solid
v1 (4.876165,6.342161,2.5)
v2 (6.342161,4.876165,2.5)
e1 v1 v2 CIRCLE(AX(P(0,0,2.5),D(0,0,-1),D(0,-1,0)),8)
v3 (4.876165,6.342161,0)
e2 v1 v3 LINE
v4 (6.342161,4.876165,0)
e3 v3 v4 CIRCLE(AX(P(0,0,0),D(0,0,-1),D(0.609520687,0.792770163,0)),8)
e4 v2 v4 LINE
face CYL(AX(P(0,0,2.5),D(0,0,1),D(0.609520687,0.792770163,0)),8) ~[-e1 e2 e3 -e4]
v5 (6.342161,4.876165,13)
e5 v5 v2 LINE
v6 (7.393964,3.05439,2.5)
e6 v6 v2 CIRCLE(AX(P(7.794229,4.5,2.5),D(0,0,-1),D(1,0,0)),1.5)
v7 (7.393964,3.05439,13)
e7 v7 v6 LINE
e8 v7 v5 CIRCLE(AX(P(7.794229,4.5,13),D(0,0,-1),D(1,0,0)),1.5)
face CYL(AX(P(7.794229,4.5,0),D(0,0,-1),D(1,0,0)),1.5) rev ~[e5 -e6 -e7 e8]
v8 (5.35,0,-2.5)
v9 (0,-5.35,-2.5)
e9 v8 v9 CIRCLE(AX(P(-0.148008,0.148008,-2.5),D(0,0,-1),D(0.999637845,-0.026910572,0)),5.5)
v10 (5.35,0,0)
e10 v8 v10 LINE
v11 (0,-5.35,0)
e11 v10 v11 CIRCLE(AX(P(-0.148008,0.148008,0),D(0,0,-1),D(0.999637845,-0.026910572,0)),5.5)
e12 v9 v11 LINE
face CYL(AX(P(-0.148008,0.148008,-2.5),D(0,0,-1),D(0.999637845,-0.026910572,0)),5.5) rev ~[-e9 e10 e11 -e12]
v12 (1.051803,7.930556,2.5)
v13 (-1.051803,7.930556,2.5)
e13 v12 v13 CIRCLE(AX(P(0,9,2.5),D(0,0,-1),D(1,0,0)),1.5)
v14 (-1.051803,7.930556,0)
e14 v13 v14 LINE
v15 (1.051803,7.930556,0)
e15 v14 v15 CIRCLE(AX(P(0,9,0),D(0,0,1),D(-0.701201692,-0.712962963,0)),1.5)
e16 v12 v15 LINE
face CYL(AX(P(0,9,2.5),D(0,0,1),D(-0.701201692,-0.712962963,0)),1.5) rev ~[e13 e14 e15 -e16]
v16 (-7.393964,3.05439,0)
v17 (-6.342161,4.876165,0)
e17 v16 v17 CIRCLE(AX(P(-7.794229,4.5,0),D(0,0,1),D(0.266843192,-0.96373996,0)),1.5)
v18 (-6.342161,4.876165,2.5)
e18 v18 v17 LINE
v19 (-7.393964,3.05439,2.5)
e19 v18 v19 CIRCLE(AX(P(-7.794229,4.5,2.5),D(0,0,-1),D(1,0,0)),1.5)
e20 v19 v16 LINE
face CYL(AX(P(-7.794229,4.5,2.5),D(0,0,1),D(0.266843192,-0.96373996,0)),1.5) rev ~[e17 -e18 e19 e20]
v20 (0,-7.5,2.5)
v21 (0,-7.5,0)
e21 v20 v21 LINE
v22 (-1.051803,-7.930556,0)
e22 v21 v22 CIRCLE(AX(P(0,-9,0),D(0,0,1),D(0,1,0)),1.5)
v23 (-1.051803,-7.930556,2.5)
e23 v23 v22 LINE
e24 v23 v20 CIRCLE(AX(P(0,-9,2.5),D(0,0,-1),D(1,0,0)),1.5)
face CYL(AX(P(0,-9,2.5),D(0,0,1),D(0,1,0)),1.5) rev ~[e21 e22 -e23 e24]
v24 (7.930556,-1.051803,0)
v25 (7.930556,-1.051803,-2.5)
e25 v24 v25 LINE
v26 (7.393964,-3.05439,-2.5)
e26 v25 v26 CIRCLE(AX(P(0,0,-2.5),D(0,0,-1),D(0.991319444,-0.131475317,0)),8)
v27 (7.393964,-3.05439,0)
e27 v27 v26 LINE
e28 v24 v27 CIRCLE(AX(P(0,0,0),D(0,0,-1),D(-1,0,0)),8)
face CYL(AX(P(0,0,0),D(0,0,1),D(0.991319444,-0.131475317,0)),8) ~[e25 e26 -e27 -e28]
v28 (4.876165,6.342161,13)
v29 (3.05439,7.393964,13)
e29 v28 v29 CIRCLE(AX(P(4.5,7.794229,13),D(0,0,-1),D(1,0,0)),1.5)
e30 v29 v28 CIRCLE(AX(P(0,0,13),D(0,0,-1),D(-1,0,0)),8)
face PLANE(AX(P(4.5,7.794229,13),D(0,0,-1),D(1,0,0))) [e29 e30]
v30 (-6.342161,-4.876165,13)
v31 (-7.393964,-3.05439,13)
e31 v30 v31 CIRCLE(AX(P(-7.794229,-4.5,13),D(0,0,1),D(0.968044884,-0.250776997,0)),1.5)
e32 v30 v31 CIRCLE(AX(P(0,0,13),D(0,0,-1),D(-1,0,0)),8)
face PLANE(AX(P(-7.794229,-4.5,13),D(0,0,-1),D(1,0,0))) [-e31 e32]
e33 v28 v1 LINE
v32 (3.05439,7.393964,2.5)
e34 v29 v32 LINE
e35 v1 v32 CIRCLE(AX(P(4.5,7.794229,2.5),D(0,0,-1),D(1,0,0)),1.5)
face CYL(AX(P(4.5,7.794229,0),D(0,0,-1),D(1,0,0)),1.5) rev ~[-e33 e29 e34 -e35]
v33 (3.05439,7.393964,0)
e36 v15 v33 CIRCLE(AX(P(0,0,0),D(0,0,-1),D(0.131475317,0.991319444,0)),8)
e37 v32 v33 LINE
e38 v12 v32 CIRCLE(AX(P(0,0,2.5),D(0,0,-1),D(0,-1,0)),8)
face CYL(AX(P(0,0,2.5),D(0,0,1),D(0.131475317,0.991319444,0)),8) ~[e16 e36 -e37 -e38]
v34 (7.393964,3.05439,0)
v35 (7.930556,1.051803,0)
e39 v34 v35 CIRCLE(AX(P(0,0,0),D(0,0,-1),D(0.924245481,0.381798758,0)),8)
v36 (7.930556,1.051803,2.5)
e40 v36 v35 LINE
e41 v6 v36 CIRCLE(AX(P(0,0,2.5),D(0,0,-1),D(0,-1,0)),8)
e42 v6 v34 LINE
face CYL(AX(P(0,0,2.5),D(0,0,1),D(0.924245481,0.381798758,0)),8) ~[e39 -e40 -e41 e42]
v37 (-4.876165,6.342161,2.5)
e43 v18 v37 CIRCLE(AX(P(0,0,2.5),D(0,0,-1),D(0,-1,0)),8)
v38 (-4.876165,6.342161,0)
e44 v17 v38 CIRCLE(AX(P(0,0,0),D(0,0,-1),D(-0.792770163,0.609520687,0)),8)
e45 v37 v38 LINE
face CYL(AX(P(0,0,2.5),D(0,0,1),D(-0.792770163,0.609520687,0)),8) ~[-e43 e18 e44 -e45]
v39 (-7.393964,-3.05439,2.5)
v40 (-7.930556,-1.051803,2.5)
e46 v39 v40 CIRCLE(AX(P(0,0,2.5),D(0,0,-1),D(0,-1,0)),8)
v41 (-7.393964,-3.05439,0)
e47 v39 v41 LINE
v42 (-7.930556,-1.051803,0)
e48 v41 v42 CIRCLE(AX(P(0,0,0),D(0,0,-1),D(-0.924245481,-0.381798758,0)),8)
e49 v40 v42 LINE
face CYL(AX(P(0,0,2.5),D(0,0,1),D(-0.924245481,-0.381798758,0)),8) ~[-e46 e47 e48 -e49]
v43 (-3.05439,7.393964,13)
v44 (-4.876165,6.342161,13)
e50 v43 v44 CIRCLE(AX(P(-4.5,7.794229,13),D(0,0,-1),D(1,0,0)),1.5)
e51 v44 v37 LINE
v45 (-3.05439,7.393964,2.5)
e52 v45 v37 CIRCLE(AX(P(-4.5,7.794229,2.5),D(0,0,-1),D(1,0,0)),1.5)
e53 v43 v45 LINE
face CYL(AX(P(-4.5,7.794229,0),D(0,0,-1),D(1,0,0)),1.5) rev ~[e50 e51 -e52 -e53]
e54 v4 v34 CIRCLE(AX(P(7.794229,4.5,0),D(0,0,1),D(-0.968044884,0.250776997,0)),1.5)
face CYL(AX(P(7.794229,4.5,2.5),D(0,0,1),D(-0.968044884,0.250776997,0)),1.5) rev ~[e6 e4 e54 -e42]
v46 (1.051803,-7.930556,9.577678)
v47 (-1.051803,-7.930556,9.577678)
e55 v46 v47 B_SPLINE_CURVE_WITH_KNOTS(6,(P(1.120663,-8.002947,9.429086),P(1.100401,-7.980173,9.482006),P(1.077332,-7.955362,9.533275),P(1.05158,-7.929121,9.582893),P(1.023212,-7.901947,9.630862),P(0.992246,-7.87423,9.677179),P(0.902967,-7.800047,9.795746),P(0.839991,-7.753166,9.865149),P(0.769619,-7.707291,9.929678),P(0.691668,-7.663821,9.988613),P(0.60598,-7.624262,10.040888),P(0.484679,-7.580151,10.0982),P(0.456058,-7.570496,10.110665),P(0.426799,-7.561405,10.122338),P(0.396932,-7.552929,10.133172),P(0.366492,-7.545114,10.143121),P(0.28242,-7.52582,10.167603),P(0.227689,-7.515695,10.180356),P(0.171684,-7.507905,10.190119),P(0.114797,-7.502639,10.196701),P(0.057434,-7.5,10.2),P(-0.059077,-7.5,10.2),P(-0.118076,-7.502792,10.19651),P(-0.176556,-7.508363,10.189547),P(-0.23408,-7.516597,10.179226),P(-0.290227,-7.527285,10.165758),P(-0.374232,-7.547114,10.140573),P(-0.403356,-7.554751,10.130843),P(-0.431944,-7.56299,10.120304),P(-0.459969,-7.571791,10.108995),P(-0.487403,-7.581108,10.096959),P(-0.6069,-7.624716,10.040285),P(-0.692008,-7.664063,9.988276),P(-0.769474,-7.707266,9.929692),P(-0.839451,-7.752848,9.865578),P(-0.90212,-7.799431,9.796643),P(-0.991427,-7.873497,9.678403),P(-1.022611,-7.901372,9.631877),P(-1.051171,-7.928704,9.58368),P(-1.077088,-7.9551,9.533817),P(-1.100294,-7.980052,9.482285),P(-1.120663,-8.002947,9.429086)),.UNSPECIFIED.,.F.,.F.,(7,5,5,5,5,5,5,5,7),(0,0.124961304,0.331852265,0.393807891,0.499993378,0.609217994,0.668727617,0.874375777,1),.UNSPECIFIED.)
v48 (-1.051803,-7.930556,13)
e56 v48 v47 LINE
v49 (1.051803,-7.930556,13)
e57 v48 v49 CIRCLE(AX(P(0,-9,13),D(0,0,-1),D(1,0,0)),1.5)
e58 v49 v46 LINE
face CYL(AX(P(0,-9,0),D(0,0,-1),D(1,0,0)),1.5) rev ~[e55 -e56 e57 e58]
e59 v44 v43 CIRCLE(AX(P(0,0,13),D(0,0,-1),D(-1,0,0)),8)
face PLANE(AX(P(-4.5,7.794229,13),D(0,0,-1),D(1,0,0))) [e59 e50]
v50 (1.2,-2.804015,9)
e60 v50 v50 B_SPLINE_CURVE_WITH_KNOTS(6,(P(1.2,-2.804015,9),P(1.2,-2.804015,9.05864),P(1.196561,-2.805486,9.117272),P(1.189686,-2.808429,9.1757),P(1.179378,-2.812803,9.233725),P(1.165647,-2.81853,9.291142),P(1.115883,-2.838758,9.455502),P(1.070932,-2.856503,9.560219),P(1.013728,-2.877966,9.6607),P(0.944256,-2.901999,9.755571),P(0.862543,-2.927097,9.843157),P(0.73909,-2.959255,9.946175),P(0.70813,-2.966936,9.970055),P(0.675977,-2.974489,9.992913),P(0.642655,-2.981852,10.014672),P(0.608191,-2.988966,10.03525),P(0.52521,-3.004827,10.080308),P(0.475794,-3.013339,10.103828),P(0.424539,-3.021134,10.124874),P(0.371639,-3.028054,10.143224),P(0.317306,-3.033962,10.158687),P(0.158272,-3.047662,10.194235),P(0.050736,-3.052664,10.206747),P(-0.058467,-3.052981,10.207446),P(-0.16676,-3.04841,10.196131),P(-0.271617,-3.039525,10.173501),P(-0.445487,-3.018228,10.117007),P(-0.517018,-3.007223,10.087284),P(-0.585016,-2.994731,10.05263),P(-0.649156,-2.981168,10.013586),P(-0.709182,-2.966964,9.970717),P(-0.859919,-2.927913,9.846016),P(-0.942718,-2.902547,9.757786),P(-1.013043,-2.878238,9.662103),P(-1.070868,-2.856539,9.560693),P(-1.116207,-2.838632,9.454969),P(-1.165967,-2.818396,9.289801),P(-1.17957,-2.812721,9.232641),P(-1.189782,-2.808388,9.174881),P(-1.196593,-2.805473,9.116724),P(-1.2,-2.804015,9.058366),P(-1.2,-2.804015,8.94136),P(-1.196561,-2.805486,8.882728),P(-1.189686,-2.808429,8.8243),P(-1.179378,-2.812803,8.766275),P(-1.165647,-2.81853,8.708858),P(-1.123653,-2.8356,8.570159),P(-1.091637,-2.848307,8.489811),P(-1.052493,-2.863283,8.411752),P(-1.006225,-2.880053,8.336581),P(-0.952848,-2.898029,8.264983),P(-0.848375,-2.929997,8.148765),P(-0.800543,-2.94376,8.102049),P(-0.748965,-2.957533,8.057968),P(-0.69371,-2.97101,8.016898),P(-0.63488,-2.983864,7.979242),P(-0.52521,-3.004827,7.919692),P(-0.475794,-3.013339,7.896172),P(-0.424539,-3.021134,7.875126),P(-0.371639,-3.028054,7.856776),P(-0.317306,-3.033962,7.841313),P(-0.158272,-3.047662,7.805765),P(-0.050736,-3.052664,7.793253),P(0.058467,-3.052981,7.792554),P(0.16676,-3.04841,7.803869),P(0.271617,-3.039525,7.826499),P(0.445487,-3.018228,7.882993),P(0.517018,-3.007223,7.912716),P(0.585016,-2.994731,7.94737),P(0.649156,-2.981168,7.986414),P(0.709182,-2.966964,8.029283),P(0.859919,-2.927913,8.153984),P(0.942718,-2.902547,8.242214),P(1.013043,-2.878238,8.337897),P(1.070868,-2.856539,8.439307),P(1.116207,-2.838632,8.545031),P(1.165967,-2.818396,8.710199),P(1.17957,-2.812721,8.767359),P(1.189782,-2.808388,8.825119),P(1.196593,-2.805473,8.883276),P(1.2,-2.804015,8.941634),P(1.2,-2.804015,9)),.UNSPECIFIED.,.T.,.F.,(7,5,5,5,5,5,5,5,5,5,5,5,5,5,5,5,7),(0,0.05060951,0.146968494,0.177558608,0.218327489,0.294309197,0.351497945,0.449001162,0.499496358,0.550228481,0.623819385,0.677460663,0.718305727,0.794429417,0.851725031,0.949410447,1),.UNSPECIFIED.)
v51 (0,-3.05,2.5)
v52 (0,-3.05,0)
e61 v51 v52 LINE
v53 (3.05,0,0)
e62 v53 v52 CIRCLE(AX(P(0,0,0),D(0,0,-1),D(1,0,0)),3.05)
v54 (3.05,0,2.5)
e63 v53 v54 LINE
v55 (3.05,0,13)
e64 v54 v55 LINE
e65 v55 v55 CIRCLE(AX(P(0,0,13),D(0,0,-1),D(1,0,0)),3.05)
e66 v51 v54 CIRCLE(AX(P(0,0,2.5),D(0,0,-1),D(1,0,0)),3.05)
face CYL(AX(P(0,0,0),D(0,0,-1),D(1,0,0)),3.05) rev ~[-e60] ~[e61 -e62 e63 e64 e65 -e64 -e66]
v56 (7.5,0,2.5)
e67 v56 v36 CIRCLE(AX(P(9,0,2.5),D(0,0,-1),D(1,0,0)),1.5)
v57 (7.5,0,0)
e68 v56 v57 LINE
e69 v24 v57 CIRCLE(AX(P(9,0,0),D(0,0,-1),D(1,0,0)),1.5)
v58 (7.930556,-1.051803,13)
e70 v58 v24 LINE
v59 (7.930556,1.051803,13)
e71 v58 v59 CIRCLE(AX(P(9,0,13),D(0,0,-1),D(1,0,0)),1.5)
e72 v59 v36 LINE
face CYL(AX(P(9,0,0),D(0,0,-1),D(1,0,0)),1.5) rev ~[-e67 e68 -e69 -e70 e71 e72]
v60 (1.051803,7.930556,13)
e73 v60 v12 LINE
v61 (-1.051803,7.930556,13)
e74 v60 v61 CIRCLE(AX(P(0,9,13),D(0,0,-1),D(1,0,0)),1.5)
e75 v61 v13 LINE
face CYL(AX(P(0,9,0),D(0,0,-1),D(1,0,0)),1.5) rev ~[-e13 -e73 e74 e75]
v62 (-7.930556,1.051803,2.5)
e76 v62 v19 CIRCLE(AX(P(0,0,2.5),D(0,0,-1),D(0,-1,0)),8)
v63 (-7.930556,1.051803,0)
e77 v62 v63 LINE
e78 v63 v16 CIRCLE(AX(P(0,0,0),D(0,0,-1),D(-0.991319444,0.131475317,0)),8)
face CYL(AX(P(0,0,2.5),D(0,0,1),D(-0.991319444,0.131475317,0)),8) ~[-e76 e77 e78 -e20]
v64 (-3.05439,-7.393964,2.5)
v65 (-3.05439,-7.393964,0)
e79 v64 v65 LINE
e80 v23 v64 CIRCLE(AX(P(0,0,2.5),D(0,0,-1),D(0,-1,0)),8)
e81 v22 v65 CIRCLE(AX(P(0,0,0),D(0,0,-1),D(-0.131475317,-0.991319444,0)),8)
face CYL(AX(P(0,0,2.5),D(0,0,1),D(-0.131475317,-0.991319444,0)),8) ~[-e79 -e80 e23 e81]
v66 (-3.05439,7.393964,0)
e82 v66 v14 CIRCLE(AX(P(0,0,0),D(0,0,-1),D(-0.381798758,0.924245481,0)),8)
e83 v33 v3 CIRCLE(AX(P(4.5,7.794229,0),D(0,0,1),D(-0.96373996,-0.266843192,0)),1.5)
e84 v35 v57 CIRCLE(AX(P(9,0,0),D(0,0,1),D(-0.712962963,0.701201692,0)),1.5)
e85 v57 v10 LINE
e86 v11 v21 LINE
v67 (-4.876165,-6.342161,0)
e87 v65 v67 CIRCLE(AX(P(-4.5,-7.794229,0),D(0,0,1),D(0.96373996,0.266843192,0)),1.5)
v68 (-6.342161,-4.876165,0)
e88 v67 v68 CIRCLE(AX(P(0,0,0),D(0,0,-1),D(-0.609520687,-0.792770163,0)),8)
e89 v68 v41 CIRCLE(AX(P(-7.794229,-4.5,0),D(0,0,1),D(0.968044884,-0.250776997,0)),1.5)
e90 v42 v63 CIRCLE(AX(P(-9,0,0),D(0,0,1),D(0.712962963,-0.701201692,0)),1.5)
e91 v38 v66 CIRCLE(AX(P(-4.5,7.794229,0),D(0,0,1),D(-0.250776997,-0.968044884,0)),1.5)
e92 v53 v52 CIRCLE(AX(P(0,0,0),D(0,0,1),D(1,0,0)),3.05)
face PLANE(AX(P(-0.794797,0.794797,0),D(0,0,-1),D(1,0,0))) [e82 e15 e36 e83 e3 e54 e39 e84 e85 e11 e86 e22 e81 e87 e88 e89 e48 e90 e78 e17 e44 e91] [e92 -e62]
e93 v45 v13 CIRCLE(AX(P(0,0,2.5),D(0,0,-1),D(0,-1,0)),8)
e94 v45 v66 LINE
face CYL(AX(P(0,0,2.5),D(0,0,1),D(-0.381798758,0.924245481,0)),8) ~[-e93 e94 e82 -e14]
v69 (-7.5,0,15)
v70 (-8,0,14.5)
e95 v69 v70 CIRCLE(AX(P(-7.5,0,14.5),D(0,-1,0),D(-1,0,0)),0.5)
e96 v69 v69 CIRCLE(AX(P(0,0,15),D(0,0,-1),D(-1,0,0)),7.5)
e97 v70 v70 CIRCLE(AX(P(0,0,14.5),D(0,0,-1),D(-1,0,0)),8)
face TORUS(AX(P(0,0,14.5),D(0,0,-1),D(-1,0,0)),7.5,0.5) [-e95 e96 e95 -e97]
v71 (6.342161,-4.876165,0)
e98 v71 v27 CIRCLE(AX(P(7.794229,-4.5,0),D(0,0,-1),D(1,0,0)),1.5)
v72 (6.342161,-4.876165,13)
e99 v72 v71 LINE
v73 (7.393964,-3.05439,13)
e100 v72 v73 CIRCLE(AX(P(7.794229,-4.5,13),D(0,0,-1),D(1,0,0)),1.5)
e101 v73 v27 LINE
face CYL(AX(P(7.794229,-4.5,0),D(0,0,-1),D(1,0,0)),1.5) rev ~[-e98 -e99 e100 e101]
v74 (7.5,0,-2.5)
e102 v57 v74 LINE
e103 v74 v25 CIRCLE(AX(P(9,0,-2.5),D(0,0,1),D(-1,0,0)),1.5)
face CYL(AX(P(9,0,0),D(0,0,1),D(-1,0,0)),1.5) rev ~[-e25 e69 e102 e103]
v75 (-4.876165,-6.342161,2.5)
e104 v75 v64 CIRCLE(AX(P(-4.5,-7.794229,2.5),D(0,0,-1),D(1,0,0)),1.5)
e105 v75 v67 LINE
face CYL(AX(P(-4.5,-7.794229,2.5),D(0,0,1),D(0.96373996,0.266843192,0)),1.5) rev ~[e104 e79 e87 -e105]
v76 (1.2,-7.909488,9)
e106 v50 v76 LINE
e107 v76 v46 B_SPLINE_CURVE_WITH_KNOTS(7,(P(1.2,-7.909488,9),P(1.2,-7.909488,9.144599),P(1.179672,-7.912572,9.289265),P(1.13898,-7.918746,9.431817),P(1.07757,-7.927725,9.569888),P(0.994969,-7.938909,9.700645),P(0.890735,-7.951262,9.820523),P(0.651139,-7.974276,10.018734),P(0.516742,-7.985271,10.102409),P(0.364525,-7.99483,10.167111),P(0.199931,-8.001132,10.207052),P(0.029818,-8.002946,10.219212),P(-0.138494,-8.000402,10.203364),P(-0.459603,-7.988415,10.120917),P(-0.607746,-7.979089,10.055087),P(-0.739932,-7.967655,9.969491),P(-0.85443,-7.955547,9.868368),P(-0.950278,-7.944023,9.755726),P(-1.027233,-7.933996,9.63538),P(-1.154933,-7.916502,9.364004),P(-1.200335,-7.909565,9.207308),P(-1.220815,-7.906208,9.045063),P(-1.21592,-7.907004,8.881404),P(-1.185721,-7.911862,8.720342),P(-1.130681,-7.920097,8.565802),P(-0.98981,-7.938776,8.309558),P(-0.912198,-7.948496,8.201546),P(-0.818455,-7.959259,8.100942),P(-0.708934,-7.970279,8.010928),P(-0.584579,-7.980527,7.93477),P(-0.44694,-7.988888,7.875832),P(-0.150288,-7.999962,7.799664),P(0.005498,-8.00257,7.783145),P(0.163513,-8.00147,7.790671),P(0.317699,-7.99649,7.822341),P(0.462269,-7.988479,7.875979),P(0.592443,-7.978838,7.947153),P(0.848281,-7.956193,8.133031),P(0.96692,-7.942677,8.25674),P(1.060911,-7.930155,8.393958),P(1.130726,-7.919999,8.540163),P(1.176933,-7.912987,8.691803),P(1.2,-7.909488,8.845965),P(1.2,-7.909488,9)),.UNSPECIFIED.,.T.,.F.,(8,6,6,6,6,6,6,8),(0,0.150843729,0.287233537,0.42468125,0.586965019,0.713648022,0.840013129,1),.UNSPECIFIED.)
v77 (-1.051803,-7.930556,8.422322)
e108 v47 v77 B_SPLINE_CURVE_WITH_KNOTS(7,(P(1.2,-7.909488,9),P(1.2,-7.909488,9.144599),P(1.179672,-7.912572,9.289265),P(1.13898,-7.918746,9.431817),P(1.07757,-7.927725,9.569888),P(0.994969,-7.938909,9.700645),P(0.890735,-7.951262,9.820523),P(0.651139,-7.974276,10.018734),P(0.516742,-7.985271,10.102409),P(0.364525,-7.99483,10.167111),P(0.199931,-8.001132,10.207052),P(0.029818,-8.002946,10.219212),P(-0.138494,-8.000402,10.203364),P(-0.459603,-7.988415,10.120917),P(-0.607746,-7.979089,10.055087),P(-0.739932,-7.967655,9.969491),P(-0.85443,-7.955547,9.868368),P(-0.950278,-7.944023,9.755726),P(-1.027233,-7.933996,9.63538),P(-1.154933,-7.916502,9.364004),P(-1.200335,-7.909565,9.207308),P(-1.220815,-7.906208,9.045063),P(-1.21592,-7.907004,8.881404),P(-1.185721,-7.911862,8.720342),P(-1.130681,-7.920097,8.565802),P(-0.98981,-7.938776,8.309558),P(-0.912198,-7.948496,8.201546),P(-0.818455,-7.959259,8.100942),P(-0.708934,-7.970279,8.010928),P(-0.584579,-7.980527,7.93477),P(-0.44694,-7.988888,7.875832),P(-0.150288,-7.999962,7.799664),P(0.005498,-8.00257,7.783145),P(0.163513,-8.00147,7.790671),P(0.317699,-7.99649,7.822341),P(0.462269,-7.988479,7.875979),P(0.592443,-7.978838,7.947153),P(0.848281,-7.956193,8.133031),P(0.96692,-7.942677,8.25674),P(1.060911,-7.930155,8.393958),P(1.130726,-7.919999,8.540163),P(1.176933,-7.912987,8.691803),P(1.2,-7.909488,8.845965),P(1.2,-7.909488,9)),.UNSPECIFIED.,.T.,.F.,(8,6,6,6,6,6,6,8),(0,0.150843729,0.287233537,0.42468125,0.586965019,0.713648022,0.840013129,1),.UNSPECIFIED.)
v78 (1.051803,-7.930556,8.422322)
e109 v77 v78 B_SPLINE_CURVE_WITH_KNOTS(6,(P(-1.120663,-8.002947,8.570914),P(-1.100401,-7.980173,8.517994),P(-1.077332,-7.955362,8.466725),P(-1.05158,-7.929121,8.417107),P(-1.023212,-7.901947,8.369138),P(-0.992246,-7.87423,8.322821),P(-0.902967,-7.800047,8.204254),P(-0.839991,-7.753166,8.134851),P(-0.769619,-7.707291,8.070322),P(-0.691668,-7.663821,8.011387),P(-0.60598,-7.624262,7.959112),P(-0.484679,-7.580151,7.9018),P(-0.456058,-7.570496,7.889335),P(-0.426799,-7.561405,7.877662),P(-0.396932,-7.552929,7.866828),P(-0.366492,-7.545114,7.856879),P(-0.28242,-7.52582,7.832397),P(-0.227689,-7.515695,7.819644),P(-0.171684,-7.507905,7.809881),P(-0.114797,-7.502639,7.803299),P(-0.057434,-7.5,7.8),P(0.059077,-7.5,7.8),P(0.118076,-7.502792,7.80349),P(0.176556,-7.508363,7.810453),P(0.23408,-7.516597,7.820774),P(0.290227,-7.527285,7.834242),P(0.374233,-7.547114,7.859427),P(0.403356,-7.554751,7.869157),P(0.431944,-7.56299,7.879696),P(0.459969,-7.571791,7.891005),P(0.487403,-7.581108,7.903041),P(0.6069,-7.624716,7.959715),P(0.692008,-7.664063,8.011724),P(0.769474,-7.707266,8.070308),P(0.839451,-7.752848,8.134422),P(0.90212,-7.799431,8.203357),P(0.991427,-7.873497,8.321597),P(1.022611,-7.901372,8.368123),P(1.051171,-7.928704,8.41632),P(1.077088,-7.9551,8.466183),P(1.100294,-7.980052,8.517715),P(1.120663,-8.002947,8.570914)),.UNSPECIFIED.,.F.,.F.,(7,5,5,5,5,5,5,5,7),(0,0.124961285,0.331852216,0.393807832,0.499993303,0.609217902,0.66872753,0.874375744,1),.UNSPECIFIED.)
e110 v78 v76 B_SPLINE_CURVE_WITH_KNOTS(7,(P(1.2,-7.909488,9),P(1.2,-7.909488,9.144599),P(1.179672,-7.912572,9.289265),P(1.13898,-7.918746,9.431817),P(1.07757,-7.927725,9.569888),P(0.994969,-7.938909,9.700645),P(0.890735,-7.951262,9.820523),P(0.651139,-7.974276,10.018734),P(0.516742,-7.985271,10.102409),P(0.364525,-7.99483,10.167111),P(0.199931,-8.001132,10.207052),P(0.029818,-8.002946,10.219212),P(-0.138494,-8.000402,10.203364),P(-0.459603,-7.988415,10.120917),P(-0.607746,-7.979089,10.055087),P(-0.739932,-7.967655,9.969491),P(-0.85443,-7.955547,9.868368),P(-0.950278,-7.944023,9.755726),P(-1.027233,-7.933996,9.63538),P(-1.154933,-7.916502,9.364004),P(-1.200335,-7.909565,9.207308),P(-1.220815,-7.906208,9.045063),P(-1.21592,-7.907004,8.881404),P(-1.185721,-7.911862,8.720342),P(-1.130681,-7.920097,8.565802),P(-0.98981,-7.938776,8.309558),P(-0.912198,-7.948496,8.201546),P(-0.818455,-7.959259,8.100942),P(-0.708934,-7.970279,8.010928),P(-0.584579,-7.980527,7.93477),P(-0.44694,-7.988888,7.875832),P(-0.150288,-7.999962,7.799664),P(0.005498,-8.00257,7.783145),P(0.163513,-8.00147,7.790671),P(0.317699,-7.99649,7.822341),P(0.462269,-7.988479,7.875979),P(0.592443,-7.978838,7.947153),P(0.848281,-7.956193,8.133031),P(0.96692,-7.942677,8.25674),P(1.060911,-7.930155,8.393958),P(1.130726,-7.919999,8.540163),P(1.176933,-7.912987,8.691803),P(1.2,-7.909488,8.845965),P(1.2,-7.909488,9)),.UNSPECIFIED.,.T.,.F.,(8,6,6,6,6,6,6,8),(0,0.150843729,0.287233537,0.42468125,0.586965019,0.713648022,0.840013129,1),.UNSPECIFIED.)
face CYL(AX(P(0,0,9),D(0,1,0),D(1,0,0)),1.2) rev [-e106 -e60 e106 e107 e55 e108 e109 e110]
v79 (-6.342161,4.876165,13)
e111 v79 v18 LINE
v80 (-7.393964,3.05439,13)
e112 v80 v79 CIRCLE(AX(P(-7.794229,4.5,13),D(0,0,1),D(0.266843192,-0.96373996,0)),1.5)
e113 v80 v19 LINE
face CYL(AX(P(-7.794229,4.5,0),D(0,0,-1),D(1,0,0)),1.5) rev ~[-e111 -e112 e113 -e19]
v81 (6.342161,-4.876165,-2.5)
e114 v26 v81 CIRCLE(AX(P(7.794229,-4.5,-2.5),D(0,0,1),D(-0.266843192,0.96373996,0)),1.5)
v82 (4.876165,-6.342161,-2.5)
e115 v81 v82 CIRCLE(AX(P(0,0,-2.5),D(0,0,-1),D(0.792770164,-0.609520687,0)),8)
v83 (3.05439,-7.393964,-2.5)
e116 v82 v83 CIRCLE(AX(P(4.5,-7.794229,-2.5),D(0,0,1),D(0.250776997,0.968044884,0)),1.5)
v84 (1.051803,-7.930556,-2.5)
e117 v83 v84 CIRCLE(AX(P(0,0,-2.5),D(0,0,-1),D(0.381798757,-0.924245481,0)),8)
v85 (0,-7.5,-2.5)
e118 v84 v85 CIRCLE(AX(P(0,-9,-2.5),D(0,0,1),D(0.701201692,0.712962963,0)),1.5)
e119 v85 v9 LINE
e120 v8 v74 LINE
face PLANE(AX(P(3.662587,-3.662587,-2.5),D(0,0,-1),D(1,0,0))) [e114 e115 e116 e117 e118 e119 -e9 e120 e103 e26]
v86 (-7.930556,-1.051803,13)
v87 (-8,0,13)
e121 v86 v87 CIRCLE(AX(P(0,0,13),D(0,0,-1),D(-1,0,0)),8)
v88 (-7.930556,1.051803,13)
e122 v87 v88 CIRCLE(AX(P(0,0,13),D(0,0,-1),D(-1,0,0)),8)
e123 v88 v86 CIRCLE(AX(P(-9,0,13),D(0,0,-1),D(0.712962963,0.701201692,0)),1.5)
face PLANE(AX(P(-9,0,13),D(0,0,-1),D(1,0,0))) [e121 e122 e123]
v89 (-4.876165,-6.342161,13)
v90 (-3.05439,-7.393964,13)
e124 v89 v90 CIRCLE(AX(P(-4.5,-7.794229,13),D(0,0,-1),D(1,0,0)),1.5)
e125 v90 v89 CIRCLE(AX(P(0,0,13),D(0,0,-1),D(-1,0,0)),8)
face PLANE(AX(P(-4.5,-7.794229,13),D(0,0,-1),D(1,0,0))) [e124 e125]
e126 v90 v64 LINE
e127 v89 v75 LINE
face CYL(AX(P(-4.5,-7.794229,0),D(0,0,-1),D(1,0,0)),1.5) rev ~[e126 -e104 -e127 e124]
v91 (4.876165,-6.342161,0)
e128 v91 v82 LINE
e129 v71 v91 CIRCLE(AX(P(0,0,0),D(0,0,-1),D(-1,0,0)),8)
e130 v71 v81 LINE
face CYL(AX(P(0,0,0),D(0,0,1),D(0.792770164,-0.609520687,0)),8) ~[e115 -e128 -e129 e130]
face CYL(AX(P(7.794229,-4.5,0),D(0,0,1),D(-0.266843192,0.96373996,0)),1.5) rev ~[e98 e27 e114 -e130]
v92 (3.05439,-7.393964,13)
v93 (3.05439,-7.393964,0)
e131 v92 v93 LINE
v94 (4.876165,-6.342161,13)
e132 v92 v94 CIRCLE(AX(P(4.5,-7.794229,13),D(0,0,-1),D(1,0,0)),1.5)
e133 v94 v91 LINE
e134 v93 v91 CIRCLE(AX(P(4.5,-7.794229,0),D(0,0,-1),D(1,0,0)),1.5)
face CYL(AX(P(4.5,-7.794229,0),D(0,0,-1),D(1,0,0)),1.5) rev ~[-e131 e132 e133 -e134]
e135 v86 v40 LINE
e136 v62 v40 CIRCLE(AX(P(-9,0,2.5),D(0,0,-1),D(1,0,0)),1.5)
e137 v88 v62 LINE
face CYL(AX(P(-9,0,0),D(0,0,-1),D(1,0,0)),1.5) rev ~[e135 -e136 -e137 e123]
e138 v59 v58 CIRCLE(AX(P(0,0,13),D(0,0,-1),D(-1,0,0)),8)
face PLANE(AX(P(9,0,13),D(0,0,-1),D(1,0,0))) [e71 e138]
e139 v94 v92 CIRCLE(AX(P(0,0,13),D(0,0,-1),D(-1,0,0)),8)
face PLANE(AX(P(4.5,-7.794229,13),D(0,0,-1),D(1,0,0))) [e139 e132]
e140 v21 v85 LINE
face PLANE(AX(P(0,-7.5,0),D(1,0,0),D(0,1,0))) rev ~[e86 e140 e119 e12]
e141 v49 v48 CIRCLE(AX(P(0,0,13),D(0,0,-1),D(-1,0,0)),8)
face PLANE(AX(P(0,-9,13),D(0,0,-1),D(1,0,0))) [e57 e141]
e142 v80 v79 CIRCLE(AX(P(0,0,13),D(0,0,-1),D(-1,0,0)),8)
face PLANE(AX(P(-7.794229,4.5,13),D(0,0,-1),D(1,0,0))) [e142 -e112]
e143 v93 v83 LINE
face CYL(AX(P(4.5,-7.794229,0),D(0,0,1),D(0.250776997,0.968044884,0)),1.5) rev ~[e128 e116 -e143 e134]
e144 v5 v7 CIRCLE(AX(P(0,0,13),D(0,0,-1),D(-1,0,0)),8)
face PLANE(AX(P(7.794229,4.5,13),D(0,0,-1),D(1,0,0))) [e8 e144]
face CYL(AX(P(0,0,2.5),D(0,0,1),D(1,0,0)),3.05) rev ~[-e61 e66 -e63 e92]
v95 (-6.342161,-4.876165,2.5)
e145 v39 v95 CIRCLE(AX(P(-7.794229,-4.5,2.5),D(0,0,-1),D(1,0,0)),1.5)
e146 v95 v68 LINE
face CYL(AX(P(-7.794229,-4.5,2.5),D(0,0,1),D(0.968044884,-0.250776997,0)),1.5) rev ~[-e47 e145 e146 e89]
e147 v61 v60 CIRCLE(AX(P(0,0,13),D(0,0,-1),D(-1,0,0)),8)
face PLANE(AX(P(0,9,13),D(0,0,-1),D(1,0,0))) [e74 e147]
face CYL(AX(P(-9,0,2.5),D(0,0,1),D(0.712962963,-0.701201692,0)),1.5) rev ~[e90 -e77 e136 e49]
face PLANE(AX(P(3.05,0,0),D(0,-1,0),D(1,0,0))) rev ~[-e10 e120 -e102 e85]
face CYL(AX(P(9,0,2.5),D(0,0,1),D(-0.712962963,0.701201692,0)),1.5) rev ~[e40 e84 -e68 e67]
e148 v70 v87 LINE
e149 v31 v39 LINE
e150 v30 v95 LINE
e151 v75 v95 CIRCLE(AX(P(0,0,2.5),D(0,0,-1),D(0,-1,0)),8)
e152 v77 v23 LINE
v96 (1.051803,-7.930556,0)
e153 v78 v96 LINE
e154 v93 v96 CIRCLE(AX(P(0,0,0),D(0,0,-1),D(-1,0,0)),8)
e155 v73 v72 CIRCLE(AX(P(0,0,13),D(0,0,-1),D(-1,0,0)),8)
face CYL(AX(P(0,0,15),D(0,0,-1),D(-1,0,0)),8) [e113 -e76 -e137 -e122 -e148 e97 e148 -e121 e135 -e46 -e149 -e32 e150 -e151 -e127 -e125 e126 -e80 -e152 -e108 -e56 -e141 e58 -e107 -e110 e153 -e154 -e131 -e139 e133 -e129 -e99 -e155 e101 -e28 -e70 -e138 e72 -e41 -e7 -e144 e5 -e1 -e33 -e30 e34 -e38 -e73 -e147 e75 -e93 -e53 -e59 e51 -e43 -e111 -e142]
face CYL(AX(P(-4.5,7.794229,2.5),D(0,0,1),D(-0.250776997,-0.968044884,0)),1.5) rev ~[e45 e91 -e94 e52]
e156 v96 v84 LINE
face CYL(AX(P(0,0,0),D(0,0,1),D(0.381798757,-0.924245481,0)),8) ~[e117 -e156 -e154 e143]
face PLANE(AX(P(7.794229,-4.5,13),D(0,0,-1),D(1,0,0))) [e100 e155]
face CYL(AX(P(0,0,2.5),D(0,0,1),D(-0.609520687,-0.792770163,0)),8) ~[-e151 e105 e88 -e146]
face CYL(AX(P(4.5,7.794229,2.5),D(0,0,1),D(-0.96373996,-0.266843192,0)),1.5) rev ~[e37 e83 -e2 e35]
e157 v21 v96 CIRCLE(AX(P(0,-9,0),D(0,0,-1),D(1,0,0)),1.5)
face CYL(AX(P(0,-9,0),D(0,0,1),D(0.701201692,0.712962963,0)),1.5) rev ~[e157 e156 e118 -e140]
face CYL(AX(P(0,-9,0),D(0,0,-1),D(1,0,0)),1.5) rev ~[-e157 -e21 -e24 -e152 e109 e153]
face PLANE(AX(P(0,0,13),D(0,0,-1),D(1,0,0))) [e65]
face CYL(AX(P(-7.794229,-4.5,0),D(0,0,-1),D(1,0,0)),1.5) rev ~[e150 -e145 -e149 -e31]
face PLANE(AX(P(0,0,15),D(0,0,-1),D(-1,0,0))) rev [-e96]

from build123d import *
from build123d import SkipClean  # not in build123d's __all__

# Parameters (mm, degrees)
F2_R      = 3.05
F3_DEPTH  = 13
F4_R      = 0.5
F5_R      = 1.2
F6_DEPTH  = 10
F7_R      = 1.5
F8_DEPTH  = 13
F10_DEPTH = 2.5
F11_DEPTH = 2.5
F13_DEPTH = 2.5


# Not quite as in the source:
# - after a boolean that leaves OpenCascade's solid faulty, fix() repairs it


with BuildPart() as f1:
    # F0 (on Front) → F1 (revolve)
    with BuildSketch(Plane.XZ):
        Polygon((-5, 0), (0, 0), (0, 15), (-8, 15), (-8, 0), align=None)
    revolve(axis=Axis((0, 0, -3.6677676575), (0, 0, -1)))

    # F2 (on face) → F3 (cut)
    with BuildSketch(Plane(origin=(0, 0, 0), x_dir=(1, 0, 0), z_dir=(0, 0, -1))):
        Circle(F2_R)
    extrude(amount=-F3_DEPTH, mode=Mode.SUBTRACT)

    # F4
    f4_edges = [f1.edges().sort_by_distance(p)[0] for p in [
        (8, 0, 15),
    ]]
    fillet(f4_edges, radius=F4_R)

    # F5 (on Front) → F6 (cut)
    with BuildSketch(Plane.XZ):
        with Locations((0, 9)):
            Circle(F5_R)
    extrude(amount=F6_DEPTH, mode=Mode.SUBTRACT)

    # F7 (on face) → F8 (cut)
    with BuildSketch(Plane(origin=(0, 0, 0), x_dir=(1, 0, 0), z_dir=(0, 0, -1))):
        with Locations((-9, 0)):
            Circle(F7_R)
        with Locations((-7.7942286341, -4.5)):
            Circle(F7_R)
        with Locations((-4.5, -7.7942286341)):
            Circle(F7_R)
        with Locations((0, -9)):
            Circle(F7_R)
        with Locations((4.5, -7.7942286341)):
            Circle(F7_R)
        with Locations((7.7942286341, -4.5)):
            Circle(F7_R)
        with Locations((9, 0)):
            Circle(F7_R)
        with Locations((7.7942286341, 4.5)):
            Circle(F7_R)
        with Locations((4.5, 7.7942286341)):
            Circle(F7_R)
        with Locations((0, 9)):
            Circle(F7_R)
        with Locations((-4.5, 7.7942286341)):
            Circle(F7_R)
        with Locations((-7.7942286341, 4.5)):
            Circle(F7_R)
    extrude(amount=-F8_DEPTH, mode=Mode.SUBTRACT)

    # F9 (on face) → F10 (cut)
    with BuildSketch(Plane(origin=(0, 0, 0), x_dir=(1, 0, 0), z_dir=(0, 0, -1))):
        with BuildLine():
            Line((8, 0), (0, 0))
            Line((0, 0), (0, 8))
            ThreePointArc((0, 8), (-5.6568542495, -5.6568542495), (8, 0))
        make_face()
    extrude(amount=-F10_DEPTH, mode=Mode.SUBTRACT)

    # F10_face (on face) + F1_face (on face) → F11 (join)
    with BuildSketch(Plane(origin=(-1.2304392028, 1.2304392022, 2.5), x_dir=(1, 0, 0), z_dir=(0, 0, -1))):
        with BuildLine():
            Line((8.7304392028, 1.2304392022), (4.2804392028, 1.2304392022))
            ThreePointArc((4.2804392028, 1.2304392022), (-0.9262364799, -0.9262364804), (1.2304392028, 4.2804392022))
            Line((1.2304392028, 4.2804392022), (1.2304392028, 8.7304392022))
            ThreePointArc((1.2304392028, 8.7304392022), (0.6621816316, 8.8422449317), (0.1786366634, 9.1609947585))
            ThreePointArc((0.1786366641, 9.1609947578), (-0.8401131581, 8.9578458126), (-1.8239508568, 8.6244030488))
            ThreePointArc((-1.8239508568, 8.6244030488), (-2.5195607972, 7.7256297306), (-3.6457262932, 7.5726005102))
            ThreePointArc((-3.6457262932, 7.5726005102), (-4.4264150467, 6.8872934517), (-5.1117221052, 6.1066046982))
            ThreePointArc((-5.1117221052, 6.1066046982), (-5.2647513256, 4.9804392022), (-6.1635246438, 4.2848292618))
            ThreePointArc((-6.1635246438, 4.2848292618), (-6.4969674076, 3.3009915631), (-6.7001163528, 2.2822417409))
            ThreePointArc((-6.7001163528, 2.2822417409), (-6.2695607972, 1.2304392022), (-6.7001163528, 0.1786366636))
            ThreePointArc((-6.7001163528, 0.1786366636), (-6.4969674076, -0.8401131586), (-6.1635246438, -1.8239508573))
            ThreePointArc((-6.1635246438, -1.8239508573), (-5.2647513256, -2.5195607978), (-5.1117221052, -3.6457262937))
            ThreePointArc((-5.1117221052, -3.6457262937), (-4.4264150467, -4.4264150472), (-3.6457262932, -5.1117221057))
            ThreePointArc((-3.6457262932, -5.1117221057), (-2.5195607972, -5.2647513261), (-1.8239508568, -6.1635246443))
            ThreePointArc((-1.8239508568, -6.1635246443), (-0.8401131581, -6.4969674081), (0.1786366641, -6.7001163533))
            ThreePointArc((0.1786366641, -6.7001163533), (1.2304392028, -6.2695607978), (2.2822417414, -6.7001163533))
            ThreePointArc((2.2822417414, -6.7001163533), (3.3009915636, -6.4969674081), (4.2848292623, -6.1635246443))
            ThreePointArc((4.2848292623, -6.1635246443), (4.9804392028, -5.2647513261), (6.1066046987, -5.1117221057))
            ThreePointArc((6.1066046987, -5.1117221057), (6.8872934522, -4.4264150472), (7.5726005107, -3.6457262937))
            ThreePointArc((7.5726005107, -3.6457262937), (7.7256297311, -2.5195607978), (8.6244030493, -1.8239508573))
            ThreePointArc((8.6244030493, -1.8239508573), (8.9578458131, -0.8401131586), (9.1609947583, 0.1786366636))
            ThreePointArc((9.1609947583, 0.1786366636), (8.842244932, 0.6621816315), (8.7304392028, 1.2304392022))
        make_face()
    with BuildSketch(Plane(origin=(0, 0, 0), x_dir=(1, 0, 0), z_dir=(0, 0, -1))):
        with BuildLine():
            ThreePointArc((1.0518025386, 7.9305555556), (0.5682575707, 7.6118057293), (0, 7.5))
            Line((0, 7.5), (0, 3.05))
            ThreePointArc((0, 3.05), (2.1566756826, 2.1566756826), (3.05, 0))
            Line((3.05, 0), (7.5, 0))
            ThreePointArc((7.5, 0), (7.6118057293, 0.5682575707), (7.9305555556, 1.0518025386))
            ThreePointArc((7.9305555556, 1.0518025386), (7.7274066103, 2.0705523608), (7.3939638465, 3.0543900596))
            ThreePointArc((7.3939638465, 3.0543900596), (6.4951905284, 3.75), (6.3421613079, 4.876165496))
            ThreePointArc((6.3421613079, 4.876165496), (5.6568542495, 5.6568542495), (4.876165496, 6.3421613079))
            ThreePointArc((4.876165496, 6.3421613079), (3.75, 6.4951905284), (3.0543900596, 7.3939638465))
            ThreePointArc((3.0543900596, 7.3939638465), (2.0705523608, 7.7274066103), (1.0518025386, 7.9305555556))
        make_face()
    with SkipClean():  # cleaning this boolean's faces spoils the solid; the shape is the same uncleaned
        extrude(amount=F11_DEPTH)

    # F12 (on face) → F13 (cut)
    with BuildSketch(Plane(origin=(0, 0, -2.5), x_dir=(1, 0, 0), z_dir=(0, 0, -1))):
        with BuildLine():
            ThreePointArc((0, 3.05), (2.1566756826, 2.1566756826), (3.05, 0))
            Line((3.05, 0), (5.35, 0))
            ThreePointArc((5.35, 0), (3.7410791492, 3.7410791492), (0, 5.35))
            Line((0, 5.35), (0, 3.05))
        make_face()
    extrude(amount=-F13_DEPTH, mode=Mode.SUBTRACT)

    add(f1.part.fix(), mode=Mode.REPLACE)


solid = f1.part
